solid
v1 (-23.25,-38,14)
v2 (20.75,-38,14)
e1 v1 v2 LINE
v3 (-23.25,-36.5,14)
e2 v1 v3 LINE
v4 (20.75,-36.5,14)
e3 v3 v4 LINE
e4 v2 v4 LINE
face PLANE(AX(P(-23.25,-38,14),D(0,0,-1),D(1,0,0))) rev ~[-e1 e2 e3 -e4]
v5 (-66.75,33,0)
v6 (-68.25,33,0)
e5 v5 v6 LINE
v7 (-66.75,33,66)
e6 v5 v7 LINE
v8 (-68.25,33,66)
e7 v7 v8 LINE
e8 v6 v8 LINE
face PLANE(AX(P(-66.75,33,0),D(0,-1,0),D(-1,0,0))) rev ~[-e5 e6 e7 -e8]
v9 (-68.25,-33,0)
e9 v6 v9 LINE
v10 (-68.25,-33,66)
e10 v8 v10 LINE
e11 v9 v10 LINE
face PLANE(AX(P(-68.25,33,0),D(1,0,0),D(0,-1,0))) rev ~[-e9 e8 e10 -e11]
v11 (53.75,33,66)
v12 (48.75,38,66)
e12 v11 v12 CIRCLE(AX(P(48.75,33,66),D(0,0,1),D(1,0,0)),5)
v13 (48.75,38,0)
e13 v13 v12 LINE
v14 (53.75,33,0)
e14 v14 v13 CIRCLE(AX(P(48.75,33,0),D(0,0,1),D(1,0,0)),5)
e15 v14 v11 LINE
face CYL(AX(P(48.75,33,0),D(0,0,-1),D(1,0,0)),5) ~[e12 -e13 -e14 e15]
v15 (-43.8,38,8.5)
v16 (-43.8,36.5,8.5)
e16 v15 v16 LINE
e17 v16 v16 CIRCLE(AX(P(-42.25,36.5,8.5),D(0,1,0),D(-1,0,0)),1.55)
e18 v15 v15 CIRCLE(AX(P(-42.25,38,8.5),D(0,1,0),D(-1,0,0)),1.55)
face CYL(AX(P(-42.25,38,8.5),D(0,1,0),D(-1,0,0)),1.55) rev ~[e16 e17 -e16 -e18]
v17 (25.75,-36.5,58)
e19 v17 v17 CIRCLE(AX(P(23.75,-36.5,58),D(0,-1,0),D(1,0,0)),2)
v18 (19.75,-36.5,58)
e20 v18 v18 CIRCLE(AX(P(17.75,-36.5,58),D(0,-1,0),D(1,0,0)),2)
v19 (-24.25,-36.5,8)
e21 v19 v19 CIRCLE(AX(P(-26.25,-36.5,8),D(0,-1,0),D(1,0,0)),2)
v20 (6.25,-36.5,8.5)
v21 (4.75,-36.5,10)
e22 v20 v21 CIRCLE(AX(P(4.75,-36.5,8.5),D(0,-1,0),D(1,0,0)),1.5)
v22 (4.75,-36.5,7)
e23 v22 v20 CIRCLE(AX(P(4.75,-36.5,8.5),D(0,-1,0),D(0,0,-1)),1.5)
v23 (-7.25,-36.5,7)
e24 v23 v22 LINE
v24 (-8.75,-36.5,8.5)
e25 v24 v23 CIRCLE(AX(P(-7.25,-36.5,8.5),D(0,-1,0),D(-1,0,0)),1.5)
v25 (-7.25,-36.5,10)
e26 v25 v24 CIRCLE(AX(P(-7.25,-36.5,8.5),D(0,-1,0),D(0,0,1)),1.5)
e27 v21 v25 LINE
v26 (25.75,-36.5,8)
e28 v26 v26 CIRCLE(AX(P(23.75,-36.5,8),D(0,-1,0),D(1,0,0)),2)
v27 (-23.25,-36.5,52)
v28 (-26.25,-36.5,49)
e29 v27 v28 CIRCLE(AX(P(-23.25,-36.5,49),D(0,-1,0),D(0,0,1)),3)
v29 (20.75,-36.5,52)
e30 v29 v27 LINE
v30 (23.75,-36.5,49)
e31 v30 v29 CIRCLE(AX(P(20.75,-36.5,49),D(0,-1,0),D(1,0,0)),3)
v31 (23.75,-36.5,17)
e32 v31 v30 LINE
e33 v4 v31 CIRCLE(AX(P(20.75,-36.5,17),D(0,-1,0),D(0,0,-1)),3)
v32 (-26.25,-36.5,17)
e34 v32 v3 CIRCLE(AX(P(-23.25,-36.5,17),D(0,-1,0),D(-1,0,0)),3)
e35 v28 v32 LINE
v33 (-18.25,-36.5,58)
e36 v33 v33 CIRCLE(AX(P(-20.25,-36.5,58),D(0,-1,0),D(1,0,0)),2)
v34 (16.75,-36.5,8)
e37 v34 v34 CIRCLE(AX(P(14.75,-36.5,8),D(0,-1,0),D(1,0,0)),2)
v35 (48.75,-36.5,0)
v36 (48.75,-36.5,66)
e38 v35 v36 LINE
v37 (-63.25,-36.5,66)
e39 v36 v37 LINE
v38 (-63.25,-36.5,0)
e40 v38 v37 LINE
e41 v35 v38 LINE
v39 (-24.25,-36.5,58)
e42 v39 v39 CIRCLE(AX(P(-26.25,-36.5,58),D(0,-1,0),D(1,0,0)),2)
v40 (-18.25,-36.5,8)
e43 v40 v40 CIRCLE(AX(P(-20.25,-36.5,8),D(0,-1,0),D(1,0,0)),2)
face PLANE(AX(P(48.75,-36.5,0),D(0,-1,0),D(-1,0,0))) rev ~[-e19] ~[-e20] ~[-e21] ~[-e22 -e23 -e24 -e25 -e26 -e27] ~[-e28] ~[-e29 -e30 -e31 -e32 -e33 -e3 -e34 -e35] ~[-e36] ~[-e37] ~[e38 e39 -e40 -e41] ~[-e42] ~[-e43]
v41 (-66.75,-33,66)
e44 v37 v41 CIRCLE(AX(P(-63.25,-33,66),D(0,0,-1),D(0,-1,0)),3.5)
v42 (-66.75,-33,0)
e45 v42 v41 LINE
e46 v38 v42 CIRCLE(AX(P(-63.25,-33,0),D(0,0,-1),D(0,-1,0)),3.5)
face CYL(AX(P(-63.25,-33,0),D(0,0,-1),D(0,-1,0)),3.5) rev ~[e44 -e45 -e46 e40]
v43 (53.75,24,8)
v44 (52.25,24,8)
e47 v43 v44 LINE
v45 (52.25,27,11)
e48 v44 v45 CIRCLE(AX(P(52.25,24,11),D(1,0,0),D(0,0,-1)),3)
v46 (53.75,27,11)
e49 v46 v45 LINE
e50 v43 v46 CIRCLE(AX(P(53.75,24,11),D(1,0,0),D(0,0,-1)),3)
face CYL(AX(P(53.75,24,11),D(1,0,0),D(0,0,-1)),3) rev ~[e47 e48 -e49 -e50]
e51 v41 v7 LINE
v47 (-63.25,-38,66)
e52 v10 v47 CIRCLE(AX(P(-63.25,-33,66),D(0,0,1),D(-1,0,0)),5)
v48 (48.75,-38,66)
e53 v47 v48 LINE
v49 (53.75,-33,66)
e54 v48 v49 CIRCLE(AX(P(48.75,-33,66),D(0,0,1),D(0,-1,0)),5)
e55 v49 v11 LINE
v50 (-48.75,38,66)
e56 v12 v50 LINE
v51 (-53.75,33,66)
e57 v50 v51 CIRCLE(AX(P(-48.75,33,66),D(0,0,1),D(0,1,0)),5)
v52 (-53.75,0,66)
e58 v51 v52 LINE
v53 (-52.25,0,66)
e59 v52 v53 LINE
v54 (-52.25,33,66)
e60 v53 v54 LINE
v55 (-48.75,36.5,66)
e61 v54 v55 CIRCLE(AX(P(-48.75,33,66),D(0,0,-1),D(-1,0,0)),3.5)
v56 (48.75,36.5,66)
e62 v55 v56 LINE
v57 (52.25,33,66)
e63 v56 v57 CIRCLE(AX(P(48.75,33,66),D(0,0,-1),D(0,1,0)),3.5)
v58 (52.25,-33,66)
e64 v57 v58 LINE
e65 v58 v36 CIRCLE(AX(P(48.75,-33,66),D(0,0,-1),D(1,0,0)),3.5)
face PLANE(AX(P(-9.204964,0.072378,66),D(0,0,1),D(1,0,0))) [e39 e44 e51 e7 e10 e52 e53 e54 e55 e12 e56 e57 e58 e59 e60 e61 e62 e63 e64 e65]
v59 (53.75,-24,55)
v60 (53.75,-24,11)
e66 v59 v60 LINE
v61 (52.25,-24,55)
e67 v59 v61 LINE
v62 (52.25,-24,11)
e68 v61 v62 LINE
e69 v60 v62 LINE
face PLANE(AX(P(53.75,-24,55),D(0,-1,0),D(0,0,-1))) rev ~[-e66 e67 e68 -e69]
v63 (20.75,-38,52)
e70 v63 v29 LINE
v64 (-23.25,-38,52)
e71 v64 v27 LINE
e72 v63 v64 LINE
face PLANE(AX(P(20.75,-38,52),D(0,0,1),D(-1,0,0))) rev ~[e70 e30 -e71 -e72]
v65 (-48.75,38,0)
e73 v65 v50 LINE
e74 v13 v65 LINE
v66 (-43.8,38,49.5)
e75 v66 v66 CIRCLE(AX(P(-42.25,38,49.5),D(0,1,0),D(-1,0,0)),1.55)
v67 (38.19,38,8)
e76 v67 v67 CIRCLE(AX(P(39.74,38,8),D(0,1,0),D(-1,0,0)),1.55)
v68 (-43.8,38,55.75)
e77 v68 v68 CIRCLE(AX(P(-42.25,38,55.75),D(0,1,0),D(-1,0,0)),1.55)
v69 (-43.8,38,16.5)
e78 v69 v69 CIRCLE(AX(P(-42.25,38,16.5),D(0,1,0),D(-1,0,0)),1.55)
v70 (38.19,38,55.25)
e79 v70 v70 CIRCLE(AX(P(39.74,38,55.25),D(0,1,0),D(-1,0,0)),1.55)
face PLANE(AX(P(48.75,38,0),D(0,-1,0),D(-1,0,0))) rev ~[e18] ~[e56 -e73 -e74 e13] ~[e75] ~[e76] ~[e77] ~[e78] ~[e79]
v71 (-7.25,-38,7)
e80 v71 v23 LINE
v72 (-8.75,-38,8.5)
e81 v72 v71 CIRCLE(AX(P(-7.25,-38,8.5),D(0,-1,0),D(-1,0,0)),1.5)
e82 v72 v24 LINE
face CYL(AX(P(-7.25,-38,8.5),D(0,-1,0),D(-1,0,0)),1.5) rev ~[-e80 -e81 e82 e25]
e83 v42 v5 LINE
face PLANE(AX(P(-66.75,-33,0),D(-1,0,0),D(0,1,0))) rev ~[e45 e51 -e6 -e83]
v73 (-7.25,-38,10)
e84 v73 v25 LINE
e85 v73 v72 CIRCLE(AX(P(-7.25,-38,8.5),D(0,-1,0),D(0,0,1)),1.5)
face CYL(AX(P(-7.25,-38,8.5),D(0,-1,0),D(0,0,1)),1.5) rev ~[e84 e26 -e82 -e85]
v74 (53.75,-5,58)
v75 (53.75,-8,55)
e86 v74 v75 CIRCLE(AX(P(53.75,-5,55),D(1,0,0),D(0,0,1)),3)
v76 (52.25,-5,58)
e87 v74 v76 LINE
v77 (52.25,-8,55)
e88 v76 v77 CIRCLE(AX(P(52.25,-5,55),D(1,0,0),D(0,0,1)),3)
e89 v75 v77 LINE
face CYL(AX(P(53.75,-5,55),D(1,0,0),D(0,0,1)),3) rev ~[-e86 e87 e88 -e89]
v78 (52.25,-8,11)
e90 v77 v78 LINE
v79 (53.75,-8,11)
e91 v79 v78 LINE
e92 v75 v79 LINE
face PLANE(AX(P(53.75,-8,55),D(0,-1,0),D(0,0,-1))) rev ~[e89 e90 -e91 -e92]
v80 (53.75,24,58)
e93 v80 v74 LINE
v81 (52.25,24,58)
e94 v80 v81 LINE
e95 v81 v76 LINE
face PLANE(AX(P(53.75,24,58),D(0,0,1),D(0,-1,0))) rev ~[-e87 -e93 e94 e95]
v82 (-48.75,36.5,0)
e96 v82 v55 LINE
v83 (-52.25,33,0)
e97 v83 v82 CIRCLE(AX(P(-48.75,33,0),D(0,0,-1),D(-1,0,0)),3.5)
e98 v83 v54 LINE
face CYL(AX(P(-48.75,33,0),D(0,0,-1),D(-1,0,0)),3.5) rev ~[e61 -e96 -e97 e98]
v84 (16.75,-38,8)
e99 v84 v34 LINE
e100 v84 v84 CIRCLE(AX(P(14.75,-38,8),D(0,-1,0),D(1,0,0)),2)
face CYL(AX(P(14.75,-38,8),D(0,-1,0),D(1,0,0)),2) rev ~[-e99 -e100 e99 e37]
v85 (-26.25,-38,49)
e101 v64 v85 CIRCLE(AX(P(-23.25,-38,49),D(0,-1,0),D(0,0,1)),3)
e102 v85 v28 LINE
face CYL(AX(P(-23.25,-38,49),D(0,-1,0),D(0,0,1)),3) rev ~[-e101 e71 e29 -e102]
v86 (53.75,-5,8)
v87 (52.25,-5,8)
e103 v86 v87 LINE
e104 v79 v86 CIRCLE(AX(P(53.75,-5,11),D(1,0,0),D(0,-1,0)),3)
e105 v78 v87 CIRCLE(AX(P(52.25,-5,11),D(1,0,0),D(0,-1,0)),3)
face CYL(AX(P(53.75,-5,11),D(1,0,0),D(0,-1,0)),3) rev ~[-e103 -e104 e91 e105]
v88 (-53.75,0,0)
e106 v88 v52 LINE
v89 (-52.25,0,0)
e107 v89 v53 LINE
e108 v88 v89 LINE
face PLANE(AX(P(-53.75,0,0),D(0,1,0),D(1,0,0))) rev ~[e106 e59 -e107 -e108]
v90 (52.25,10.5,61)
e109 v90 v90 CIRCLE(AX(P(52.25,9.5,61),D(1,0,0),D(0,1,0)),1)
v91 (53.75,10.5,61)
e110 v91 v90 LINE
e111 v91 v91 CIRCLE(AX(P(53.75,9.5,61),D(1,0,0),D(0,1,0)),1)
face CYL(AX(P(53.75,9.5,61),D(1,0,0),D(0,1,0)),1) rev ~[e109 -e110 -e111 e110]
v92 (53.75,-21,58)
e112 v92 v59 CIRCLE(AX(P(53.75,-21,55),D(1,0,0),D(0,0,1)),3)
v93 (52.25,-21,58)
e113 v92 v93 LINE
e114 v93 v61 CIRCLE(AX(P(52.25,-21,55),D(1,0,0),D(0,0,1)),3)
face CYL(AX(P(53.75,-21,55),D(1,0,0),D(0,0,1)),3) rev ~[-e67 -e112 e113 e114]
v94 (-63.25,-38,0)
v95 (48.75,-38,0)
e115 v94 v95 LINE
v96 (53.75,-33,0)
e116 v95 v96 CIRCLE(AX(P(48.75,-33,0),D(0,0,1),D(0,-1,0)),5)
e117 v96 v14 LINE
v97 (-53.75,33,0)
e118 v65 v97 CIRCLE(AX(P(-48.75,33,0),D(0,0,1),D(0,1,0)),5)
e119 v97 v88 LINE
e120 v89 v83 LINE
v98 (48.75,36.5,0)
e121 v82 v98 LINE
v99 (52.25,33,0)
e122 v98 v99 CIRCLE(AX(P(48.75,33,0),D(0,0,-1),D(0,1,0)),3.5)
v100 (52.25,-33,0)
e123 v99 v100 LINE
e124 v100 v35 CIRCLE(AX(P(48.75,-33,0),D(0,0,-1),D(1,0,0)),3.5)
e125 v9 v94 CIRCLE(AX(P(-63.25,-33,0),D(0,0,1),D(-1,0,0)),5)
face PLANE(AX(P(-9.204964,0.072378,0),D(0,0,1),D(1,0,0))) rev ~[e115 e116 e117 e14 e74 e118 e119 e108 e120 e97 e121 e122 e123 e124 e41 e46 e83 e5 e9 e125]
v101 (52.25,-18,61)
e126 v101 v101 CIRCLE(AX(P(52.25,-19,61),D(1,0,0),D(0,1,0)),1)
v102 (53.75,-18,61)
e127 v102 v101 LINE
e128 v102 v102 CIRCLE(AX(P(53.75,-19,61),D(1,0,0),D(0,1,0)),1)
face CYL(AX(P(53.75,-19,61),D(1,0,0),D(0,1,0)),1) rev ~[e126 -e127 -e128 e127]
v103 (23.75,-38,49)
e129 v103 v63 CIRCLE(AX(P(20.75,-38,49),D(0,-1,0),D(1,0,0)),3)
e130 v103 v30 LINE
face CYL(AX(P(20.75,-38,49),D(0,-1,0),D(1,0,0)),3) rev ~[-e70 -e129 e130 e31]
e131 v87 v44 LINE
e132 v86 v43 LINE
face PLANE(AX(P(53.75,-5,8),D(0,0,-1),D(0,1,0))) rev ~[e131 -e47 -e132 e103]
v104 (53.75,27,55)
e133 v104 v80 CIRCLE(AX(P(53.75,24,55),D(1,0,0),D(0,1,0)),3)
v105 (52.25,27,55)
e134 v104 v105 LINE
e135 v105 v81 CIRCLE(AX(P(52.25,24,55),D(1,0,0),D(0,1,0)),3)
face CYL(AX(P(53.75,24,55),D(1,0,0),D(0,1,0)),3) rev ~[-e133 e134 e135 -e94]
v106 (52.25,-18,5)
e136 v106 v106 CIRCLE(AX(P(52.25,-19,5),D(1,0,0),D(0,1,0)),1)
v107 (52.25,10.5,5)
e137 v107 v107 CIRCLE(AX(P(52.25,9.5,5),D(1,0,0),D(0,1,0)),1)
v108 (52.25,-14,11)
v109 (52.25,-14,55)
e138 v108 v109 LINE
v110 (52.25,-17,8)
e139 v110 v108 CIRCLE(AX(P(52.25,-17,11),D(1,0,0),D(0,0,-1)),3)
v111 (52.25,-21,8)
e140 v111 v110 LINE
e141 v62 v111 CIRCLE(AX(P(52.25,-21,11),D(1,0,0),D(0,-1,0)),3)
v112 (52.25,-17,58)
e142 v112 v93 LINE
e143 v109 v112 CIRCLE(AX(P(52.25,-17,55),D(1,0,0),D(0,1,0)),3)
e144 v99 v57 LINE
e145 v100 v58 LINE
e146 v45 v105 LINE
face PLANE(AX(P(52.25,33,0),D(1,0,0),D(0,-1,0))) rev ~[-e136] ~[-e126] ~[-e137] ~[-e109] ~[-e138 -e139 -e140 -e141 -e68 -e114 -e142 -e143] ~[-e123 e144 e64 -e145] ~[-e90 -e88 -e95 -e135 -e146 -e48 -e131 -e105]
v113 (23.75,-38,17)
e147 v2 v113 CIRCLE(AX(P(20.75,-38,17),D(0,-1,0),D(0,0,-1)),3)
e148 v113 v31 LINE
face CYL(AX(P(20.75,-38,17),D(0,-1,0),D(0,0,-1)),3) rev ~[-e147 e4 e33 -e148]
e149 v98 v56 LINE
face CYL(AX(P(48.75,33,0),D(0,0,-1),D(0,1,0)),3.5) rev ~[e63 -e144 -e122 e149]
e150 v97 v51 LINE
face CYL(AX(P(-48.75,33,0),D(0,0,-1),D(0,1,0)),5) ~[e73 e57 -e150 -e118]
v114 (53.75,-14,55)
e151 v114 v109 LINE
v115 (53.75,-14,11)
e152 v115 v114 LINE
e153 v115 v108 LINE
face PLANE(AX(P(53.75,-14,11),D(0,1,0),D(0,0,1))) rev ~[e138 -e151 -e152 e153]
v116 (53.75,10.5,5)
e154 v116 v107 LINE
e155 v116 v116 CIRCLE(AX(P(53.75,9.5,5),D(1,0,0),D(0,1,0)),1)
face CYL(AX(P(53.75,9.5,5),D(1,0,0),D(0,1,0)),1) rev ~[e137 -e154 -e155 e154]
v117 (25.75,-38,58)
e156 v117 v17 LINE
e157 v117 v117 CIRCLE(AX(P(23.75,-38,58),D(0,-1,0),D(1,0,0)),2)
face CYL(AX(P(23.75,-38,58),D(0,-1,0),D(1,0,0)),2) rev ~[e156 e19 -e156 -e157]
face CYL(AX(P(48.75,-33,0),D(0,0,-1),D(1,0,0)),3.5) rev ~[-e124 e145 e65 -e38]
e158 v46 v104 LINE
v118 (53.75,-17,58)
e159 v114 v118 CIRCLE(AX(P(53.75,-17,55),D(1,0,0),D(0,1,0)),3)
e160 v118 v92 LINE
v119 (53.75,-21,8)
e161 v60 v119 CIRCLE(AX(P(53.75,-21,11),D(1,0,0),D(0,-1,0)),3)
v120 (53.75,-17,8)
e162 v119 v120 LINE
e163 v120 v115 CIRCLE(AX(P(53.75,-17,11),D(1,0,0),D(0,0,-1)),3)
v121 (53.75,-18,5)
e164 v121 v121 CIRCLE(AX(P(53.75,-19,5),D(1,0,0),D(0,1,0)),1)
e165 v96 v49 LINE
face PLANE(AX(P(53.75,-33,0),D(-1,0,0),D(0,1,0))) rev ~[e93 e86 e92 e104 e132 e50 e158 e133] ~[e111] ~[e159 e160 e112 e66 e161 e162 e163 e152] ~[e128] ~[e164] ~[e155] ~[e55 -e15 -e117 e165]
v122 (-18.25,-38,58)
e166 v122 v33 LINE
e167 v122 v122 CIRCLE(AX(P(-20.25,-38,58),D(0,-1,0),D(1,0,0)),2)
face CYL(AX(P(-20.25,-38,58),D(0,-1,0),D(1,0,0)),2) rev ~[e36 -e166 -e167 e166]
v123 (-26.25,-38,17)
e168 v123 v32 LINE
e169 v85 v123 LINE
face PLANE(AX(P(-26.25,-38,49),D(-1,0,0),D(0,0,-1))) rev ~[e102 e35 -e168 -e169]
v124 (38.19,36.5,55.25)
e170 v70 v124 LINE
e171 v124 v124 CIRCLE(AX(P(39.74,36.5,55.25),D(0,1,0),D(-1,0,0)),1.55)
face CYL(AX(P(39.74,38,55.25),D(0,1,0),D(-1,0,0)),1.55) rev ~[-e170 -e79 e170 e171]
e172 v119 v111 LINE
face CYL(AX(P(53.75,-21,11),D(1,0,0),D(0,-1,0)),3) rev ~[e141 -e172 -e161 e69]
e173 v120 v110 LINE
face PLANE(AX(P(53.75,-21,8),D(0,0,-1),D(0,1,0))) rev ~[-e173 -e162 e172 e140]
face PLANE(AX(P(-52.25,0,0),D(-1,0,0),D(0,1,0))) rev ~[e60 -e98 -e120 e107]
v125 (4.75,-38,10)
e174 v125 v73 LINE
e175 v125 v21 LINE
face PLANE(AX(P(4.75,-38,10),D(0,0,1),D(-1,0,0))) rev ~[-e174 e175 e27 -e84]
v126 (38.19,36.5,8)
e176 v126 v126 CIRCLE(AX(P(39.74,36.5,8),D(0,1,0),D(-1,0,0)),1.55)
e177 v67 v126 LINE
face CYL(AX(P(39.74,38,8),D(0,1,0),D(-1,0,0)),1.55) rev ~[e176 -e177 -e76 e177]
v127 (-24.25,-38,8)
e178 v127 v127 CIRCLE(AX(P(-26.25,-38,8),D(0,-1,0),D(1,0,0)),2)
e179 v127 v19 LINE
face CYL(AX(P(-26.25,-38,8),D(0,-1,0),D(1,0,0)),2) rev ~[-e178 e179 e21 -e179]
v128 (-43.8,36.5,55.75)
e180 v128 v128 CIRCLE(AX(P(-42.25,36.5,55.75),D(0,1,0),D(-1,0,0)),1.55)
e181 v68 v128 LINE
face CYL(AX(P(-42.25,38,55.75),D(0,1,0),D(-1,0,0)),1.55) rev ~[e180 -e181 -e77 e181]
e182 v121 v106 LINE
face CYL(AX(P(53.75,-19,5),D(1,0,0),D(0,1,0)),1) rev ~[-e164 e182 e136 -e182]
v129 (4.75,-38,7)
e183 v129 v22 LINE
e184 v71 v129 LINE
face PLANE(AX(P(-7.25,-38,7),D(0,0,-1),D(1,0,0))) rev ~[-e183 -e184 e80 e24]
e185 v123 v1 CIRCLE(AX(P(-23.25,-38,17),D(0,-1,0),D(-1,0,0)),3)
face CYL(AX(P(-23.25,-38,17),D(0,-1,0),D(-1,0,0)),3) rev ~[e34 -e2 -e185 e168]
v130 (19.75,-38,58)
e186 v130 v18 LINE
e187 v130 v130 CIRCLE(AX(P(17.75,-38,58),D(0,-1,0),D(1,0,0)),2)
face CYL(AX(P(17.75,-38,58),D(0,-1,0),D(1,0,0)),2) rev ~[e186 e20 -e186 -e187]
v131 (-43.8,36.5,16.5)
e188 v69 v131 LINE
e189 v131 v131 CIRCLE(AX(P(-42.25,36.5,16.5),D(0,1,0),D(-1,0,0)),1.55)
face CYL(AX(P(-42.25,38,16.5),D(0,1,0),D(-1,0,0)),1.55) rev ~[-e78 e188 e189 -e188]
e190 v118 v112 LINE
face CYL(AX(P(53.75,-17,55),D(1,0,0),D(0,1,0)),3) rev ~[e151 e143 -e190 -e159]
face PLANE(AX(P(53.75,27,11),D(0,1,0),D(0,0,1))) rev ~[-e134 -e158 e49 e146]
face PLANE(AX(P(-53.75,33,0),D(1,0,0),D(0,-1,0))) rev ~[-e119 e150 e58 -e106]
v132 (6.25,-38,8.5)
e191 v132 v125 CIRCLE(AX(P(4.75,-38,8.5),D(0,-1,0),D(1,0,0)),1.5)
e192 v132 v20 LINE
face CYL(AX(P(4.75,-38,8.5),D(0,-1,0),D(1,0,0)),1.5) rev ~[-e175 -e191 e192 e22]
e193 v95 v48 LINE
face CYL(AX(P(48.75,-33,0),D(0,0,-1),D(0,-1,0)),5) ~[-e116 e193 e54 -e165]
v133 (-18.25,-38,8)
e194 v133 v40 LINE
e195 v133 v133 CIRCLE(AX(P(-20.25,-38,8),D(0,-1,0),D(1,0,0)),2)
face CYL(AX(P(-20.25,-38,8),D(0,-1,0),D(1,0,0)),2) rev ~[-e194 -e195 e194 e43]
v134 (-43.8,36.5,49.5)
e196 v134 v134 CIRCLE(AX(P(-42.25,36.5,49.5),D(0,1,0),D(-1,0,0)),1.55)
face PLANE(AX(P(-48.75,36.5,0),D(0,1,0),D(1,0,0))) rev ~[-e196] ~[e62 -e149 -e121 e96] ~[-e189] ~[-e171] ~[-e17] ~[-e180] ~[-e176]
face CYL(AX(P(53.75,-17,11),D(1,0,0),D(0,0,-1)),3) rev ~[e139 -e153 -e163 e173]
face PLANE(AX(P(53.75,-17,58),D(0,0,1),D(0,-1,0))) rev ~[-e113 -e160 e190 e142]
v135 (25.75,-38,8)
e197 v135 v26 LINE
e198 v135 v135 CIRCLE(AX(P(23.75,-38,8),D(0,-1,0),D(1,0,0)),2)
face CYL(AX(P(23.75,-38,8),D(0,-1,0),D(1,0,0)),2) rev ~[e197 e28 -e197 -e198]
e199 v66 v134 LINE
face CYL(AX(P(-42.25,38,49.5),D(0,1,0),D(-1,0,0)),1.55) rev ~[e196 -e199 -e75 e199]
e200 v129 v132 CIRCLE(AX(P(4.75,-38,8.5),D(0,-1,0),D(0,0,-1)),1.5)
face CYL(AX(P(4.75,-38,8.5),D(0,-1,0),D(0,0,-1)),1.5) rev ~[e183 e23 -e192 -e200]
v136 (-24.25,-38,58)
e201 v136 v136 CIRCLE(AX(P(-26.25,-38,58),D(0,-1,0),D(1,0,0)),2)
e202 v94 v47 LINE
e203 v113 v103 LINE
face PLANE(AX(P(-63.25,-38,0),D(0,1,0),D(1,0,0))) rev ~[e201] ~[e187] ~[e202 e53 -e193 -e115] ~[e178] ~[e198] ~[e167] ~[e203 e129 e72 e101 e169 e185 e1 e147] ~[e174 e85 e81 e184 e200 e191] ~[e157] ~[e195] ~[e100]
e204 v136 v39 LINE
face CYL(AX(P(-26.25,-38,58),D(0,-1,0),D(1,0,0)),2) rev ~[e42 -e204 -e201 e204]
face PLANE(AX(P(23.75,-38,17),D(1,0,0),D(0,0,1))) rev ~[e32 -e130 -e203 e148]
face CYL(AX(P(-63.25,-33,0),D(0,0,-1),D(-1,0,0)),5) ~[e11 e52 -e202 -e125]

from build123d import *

# Parameters (mm, degrees)
F1_DEPTH = 66
F2_R     = 2
F3_DEPTH = 25
F4_R     = 1.55
F5_DEPTH = 25
F6_R     = 1
F7_DEPTH = 25


# Not quite as in the source:
# - a feature names something its author has since deleted; it is built from what else it names


with BuildPart() as f1:
    # F0 (on Top) → F1 (new body)
    with BuildSketch(Plane.XY):
        with BuildLine():
            Line((-66.75, -33), (-66.75, 33))
            Line((-66.75, 33), (-68.25, 33))
            Line((-68.25, 33), (-68.25, -33))
            ThreePointArc((-68.25, -33), (-66.7855339059, -36.5355339059), (-63.25, -38))
            Line((-63.25, -38), (48.75, -38))
            ThreePointArc((48.75, -38), (52.2855339059, -36.5355339059), (53.75, -33))
            Line((53.75, -33), (53.75, 33))
            ThreePointArc((53.75, 33), (52.2855339059, 36.5355339059), (48.75, 38))
            Line((48.75, 38), (-48.75, 38))
            ThreePointArc((-48.75, 38), (-52.2855339059, 36.5355339059), (-53.75, 33))
            Line((-53.75, 33), (-53.75, 0))
            Line((-53.75, 0), (-52.25, 0))
            Line((-52.25, 0), (-52.25, 33))
            ThreePointArc((-52.25, 33), (-51.2248737342, 35.4748737342), (-48.75, 36.5))
            Line((-48.75, 36.5), (48.75, 36.5))
            ThreePointArc((48.75, 36.5), (51.2248737342, 35.4748737342), (52.25, 33))
            Line((52.25, 33), (52.25, -33))
            ThreePointArc((52.25, -33), (51.2248737342, -35.4748737342), (48.75, -36.5))
            Line((48.75, -36.5), (-63.25, -36.5))
            ThreePointArc((-63.25, -36.5), (-65.7248737342, -35.4748737342), (-66.75, -33))
        make_face()
    extrude(amount=F1_DEPTH)

    # F2 (on face) → F3 (cut)
    with BuildSketch(Plane.XZ.offset(38)):
        with BuildLine():
            Line((20.75, 52), (-23.25, 52))
            ThreePointArc((-23.25, 52), (-25.3713203436, 51.1213203436), (-26.25, 49))
            Line((-26.25, 49), (-26.25, 17))
            ThreePointArc((-26.25, 17), (-25.3713203436, 14.8786796564), (-23.25, 14))
            Line((-23.25, 14), (20.75, 14))
            ThreePointArc((20.75, 14), (22.8713203436, 14.8786796564), (23.75, 17))
            Line((23.75, 17), (23.75, 49))
            ThreePointArc((23.75, 49), (22.8713203436, 51.1213203436), (20.75, 52))
        make_face()
        with Locations((-26.25, 58)):
            Circle(F2_R)
        with Locations((23.75, 58)):
            Circle(F2_R)
        with Locations((23.75, 8)):
            Circle(F2_R)
        with Locations((-26.25, 8)):
            Circle(F2_R)
        with BuildLine():
            ThreePointArc((-8.75, 8.5), (-8.3106601718, 7.4393398282), (-7.25, 7))
            Line((-7.25, 7), (4.75, 7))
            ThreePointArc((4.75, 7), (5.8106601718, 7.4393398282), (6.25, 8.5))
            ThreePointArc((6.25, 8.5), (5.8106601718, 9.5606601718), (4.75, 10))
            Line((4.75, 10), (-7.25, 10))
            ThreePointArc((-7.25, 10), (-8.3106601718, 9.5606601718), (-8.75, 8.5))
        make_face()
        with Locations((-20.25, 8)):
            Circle(F2_R)
        with Locations((-20.25, 58)):
            Circle(F2_R)
        with Locations((17.75, 58)):
            Circle(F2_R)
        with Locations((14.75, 8)):
            Circle(F2_R)
    extrude(amount=-F3_DEPTH, mode=Mode.SUBTRACT)

    # F4 (on face) → F5 (cut)
    with BuildSketch(Plane(origin=(0, 38, 0), x_dir=(-1, 0, 0), z_dir=(0, 1, 0))):
        with Locations((-39.74, 55.25)):
            Circle(F4_R)
        with Locations((-39.74, 8)):
            Circle(F4_R)
        with Locations((42.25, 8.5)):
            Circle(F4_R)
        with Locations((42.25, 55.75)):
            Circle(F4_R)
        with Locations((42.25, 16.5)):
            Circle(F4_R)
        with Locations((42.25, 49.5)):
            Circle(F4_R)
    extrude(amount=-F5_DEPTH, mode=Mode.SUBTRACT)

    # F6 (on face) → F7 (cut)
    with BuildSketch(Plane.YZ.offset(53.75)):
        with BuildLine():
            Line((-17, 58), (-21, 58))
            ThreePointArc((-21, 58), (-23.1213203436, 57.1213203436), (-24, 55))
            Line((-24, 55), (-24, 11))
            ThreePointArc((-24, 11), (-23.1213203436, 8.8786796564), (-21, 8))
            Line((-21, 8), (-17, 8))
            ThreePointArc((-17, 8), (-14.8786796564, 8.8786796564), (-14, 11))
            Line((-14, 11), (-14, 55))
            ThreePointArc((-14, 55), (-14.8786796564, 57.1213203436), (-17, 58))
        make_face()
        with BuildLine():
            Line((24, 58), (-5, 58))
            ThreePointArc((-5, 58), (-7.1213203436, 57.1213203436), (-8, 55))
            Line((-8, 55), (-8, 11))
            ThreePointArc((-8, 11), (-7.1213203436, 8.8786796564), (-5, 8))
            Line((-5, 8), (24, 8))
            ThreePointArc((24, 8), (26.1213203436, 8.8786796564), (27, 11))
            Line((27, 11), (27, 55))
            ThreePointArc((27, 55), (26.1213203436, 57.1213203436), (24, 58))
        make_face()
        with Locations((-19, 61)):
            Circle(F6_R)
        with Locations((9.5, 61)):
            Circle(F6_R)
        with Locations((9.5, 5)):
            Circle(F6_R)
        with Locations((-19, 5)):
            Circle(F6_R)
    extrude(amount=-F7_DEPTH, mode=Mode.SUBTRACT)


solid = f1.part
